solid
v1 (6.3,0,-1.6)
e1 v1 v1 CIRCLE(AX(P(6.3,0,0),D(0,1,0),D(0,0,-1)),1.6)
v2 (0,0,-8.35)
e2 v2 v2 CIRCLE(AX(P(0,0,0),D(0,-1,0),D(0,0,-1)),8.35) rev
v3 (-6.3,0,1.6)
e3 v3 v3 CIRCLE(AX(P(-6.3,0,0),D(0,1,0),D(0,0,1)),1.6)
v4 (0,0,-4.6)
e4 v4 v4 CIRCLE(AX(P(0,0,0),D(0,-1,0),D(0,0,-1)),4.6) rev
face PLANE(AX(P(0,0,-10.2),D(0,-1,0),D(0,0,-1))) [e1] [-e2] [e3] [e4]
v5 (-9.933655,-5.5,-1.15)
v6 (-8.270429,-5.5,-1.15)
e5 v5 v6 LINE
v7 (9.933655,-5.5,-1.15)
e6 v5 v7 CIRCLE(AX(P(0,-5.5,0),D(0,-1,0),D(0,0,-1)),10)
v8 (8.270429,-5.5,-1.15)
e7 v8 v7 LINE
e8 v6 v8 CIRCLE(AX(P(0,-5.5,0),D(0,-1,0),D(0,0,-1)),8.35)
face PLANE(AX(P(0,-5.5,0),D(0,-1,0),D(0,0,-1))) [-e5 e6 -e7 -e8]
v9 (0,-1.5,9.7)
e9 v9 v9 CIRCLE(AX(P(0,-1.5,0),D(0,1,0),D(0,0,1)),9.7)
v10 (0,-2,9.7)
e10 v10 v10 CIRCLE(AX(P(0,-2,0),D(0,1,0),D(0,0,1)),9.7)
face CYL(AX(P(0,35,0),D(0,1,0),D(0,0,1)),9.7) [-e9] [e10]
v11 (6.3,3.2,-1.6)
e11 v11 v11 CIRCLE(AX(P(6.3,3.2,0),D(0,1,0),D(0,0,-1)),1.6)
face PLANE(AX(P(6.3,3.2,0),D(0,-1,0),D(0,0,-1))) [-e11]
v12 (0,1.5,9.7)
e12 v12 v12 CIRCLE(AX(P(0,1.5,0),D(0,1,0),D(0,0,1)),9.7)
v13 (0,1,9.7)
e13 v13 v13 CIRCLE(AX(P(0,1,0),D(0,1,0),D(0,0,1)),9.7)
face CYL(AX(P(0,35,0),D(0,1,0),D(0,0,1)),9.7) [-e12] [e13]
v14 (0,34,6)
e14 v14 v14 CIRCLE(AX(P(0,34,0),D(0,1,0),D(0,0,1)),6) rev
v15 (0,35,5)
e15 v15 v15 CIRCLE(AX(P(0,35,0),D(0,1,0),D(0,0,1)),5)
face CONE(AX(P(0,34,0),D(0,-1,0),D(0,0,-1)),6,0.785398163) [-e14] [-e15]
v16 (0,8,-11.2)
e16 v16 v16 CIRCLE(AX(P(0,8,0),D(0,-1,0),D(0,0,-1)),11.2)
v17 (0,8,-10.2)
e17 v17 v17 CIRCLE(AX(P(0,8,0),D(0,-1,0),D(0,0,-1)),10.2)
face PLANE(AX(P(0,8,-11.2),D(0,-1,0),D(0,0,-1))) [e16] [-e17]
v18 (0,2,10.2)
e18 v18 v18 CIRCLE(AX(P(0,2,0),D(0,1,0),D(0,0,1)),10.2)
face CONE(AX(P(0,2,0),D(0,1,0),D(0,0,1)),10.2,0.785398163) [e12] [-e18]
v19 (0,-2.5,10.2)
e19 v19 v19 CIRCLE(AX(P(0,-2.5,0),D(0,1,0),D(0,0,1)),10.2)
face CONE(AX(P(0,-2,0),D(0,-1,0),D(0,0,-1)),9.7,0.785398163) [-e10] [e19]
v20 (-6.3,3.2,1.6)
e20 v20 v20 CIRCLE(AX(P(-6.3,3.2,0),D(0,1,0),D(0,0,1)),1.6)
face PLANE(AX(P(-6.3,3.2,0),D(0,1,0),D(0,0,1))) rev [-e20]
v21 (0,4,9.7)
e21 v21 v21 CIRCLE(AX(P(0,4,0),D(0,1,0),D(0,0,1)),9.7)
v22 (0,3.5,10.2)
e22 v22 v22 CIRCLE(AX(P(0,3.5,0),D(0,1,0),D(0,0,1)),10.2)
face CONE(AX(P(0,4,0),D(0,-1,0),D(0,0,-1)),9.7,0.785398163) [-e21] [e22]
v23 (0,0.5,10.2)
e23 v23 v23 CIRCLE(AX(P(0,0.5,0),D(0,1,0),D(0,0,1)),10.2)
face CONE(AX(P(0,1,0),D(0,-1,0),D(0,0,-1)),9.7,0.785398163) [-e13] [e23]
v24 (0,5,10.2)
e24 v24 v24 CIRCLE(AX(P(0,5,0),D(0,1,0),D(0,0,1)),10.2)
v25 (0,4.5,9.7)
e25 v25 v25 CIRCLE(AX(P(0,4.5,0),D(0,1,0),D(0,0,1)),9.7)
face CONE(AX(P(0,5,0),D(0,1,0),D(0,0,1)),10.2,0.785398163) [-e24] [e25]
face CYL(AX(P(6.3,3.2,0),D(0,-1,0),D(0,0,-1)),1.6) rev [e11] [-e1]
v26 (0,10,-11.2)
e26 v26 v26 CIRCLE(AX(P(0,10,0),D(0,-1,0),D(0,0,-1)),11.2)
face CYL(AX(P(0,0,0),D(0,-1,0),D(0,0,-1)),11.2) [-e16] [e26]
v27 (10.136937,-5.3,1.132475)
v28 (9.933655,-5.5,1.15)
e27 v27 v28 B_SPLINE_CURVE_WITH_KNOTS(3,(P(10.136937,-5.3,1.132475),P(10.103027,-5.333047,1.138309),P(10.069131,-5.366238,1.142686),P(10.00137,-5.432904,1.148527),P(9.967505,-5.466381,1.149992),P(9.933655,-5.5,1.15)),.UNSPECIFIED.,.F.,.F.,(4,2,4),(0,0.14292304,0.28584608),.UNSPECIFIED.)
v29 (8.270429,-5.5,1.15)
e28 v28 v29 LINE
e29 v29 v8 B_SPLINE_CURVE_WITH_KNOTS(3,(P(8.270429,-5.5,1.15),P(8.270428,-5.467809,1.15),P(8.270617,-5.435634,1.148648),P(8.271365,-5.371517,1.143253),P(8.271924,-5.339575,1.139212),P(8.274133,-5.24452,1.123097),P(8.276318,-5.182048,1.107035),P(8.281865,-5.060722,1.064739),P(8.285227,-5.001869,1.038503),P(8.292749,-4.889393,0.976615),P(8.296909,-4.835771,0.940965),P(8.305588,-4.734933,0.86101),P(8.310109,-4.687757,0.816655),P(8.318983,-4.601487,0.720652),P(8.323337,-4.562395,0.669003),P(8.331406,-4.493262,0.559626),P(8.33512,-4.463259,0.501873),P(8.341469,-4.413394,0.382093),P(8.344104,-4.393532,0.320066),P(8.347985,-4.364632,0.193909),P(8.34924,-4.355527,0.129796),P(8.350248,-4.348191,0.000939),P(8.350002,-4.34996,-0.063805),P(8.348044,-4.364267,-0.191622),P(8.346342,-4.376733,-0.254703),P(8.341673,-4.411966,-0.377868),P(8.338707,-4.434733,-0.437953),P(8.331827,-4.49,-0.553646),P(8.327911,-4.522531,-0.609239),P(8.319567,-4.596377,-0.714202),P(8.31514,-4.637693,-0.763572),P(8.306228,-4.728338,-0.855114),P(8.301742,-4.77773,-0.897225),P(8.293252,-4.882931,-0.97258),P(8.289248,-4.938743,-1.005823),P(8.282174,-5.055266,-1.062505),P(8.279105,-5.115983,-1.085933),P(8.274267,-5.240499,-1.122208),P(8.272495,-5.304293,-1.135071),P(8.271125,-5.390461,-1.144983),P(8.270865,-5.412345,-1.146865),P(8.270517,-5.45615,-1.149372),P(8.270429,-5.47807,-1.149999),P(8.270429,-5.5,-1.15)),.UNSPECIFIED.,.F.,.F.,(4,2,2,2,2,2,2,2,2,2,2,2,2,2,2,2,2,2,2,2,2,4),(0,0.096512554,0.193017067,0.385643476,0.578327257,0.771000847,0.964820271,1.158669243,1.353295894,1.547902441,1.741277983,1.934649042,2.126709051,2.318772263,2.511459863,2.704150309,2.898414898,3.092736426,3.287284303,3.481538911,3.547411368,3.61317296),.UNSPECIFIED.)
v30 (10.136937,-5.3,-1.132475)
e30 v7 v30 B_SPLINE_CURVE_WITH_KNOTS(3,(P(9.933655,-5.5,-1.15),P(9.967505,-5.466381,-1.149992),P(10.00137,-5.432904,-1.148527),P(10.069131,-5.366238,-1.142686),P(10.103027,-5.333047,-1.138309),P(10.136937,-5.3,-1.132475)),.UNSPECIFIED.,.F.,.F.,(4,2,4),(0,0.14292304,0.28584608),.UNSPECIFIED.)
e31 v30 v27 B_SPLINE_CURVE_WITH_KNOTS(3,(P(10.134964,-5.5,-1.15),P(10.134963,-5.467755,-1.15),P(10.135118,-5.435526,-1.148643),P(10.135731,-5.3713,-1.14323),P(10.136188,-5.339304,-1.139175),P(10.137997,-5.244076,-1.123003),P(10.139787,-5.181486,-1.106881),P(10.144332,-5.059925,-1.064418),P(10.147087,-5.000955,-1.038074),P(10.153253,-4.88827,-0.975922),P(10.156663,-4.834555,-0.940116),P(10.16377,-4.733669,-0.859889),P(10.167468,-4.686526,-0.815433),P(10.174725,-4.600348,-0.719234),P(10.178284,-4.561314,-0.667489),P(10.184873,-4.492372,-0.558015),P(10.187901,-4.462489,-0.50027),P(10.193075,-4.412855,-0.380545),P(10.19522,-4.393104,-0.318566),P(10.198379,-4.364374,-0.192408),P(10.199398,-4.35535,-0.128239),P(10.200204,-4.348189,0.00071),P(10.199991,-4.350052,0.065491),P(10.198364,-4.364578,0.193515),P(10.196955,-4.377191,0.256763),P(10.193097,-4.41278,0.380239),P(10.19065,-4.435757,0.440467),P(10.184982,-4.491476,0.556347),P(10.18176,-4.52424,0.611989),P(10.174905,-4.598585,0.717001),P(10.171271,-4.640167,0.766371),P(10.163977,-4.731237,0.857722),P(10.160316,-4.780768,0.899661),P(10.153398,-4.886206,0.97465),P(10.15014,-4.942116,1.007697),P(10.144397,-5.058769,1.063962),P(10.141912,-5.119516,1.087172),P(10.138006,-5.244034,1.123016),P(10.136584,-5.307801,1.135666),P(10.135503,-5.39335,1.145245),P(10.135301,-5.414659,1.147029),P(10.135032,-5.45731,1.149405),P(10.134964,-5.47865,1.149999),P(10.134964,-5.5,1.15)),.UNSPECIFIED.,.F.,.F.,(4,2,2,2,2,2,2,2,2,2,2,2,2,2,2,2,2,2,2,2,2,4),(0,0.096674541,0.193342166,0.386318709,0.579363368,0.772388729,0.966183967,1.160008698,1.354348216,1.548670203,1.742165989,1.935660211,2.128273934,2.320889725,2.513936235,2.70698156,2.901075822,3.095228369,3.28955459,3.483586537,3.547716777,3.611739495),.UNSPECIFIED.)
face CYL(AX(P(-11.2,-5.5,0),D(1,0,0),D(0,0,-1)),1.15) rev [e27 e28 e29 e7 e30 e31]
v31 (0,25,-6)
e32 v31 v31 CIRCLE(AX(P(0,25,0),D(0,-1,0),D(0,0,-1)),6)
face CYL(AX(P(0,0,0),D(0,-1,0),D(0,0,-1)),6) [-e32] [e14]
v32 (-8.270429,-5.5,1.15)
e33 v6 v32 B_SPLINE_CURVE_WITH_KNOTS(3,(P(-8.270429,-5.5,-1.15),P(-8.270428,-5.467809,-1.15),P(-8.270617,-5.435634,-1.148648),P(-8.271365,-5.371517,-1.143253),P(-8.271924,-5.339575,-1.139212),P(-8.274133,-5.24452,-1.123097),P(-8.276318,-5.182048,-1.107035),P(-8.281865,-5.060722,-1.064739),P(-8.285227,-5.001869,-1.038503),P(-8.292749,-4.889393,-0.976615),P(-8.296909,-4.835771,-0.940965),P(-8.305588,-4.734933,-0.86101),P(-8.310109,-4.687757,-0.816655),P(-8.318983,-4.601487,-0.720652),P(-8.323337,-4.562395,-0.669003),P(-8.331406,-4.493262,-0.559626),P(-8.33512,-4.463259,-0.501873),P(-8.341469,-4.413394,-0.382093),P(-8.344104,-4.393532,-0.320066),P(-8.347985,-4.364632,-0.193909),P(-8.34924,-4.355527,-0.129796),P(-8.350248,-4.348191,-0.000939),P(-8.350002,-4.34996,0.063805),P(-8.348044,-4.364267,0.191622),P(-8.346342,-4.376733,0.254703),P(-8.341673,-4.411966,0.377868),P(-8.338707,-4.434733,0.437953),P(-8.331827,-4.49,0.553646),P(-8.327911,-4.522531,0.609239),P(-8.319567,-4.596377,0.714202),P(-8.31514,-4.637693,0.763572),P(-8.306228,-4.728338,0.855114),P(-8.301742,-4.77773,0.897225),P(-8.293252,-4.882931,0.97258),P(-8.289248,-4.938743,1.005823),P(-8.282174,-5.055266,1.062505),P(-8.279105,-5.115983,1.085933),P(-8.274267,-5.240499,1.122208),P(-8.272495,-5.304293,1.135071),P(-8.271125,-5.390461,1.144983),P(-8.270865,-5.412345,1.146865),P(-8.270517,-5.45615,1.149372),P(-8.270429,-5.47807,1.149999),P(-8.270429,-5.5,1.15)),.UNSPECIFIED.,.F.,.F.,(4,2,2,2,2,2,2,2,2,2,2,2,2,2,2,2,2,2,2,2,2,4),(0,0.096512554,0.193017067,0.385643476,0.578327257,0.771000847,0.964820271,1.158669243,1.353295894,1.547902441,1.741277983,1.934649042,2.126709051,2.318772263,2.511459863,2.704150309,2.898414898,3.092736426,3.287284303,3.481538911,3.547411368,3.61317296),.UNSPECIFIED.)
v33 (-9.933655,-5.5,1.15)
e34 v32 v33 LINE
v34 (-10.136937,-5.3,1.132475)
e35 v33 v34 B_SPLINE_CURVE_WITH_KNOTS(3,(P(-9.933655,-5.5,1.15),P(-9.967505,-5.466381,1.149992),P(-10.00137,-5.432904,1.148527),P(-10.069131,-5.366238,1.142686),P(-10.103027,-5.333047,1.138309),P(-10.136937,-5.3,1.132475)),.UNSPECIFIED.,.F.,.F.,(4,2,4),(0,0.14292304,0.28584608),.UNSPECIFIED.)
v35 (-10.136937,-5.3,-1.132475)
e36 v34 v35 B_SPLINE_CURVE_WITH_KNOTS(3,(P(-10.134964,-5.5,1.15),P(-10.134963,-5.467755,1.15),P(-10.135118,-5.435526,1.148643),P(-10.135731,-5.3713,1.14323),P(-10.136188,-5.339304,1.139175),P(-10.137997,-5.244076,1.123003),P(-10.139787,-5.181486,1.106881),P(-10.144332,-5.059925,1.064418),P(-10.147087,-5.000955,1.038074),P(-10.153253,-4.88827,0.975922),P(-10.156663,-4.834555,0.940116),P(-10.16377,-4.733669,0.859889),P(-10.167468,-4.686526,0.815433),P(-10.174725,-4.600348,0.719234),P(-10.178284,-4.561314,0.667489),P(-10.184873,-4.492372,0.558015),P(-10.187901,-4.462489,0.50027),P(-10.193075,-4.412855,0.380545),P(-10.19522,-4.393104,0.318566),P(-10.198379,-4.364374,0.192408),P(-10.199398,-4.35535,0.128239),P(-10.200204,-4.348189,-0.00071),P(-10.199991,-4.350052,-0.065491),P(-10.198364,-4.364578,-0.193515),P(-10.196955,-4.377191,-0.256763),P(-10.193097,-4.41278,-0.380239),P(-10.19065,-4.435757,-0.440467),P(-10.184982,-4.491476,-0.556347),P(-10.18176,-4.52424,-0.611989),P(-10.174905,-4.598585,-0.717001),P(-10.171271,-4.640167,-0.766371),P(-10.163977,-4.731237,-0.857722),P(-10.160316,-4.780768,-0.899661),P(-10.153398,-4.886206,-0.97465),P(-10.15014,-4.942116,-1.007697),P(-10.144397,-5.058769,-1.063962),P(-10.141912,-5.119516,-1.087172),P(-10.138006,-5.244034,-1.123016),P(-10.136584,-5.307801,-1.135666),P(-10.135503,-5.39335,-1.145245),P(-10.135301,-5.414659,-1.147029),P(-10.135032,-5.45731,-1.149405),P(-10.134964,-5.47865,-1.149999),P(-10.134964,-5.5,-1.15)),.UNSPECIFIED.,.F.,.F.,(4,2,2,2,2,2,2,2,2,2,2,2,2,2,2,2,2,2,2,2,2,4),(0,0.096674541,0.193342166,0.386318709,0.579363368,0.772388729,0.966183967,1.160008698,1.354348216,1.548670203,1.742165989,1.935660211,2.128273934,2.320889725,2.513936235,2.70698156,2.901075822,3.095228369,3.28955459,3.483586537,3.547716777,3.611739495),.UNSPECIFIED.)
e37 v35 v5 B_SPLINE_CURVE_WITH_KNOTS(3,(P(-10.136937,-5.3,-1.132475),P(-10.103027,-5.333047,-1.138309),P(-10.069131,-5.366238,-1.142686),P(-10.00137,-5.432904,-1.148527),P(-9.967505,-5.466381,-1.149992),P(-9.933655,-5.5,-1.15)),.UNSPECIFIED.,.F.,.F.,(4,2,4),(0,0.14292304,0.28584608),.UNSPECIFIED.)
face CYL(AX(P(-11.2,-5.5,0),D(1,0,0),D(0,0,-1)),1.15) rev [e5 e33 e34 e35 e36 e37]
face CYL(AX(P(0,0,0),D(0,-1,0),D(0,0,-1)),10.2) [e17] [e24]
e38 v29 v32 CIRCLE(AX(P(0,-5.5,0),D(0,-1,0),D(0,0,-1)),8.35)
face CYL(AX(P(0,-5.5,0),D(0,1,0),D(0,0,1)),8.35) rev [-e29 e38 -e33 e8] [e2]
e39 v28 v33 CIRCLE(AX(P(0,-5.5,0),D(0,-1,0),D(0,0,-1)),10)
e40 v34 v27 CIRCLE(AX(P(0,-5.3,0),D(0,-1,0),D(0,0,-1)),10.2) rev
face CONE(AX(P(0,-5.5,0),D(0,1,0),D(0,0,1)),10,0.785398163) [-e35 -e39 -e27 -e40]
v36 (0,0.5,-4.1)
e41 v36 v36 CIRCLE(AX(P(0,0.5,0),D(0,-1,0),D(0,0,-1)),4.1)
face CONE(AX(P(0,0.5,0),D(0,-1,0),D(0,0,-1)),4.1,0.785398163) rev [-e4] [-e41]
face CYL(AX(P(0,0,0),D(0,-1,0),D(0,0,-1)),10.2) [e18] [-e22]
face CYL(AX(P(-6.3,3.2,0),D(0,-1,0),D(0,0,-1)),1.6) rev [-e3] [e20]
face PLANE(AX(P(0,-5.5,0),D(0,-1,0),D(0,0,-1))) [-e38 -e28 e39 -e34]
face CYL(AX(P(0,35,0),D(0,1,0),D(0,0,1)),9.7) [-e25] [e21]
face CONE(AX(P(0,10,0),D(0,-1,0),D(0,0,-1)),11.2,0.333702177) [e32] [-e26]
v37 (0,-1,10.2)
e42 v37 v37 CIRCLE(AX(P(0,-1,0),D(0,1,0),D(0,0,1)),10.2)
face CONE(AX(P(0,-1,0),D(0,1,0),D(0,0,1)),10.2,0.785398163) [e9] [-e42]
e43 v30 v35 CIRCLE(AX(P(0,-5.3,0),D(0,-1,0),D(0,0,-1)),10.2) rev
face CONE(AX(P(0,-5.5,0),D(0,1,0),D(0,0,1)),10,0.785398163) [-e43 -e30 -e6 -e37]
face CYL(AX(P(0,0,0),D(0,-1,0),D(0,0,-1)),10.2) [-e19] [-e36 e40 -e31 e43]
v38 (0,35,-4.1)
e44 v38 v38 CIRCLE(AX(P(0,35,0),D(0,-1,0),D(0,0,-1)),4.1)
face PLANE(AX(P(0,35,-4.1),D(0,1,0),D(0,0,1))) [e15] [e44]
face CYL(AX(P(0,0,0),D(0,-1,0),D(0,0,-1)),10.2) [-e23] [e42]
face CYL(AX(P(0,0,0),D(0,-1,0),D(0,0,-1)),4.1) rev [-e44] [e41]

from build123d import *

# Parameters (mm, degrees)
CHAMFER_1_SIZE           = 1
SKETCH_2_R               = 1.6
CUT_EXTRUDE_1_DEPTH      = 3.2
EXTRUDE_START            = 5.5
SKETCH_3_R               = 10.2
SKETCH_3_R_2             = 8.35
EXTRUDE_1_DEPTH          = 5.5
CHAMFER_2_SIZE           = 0.5
CUT_EXTRUDE_2_DEPTH      = 39.417183655
CUT_EXTRUDE_2_DEPTH_BACK = 39.417183655
SKETCH_4_R               = 1.15


with BuildPart() as part:
    # 스케치1 → 회전1 (revolve)
    with BuildSketch(Plane(origin=(0, 0, 0), x_dir=(0, 0, -1), z_dir=(1, 0, 0))):
        Polygon((4.1, 0), (4.1, 35), (6, 35), (6, 25), (11.2, 10), (11.2, 8), (10.2, 8), (10.2, 5.7), (10.2, 4), (10.2, 0), align=None)
    revolve(axis=Axis((0, 0, 0), (0, 1, 0)))

    # 모따기1
    chamfer_1_edges = [part.edges().sort_by_distance(p)[0] for p in [
        (0, 35, 6),
    ]]
    chamfer(chamfer_1_edges, length=CHAMFER_1_SIZE)

    # 스케치2 → 컷-돌출1 (cut)
    with BuildSketch(Plane(origin=(0, 0, 0), x_dir=(1, 0, 0), z_dir=(0, 1, 0))):
        with Locations(Location((-6.3, 0, 0), (0, 0, 270))):
            Circle(SKETCH_2_R)
        with Locations(Location((6.3, 0, 0), (0, 0, 90))):
            Circle(SKETCH_2_R)
    extrude(amount=CUT_EXTRUDE_1_DEPTH, mode=Mode.SUBTRACT)

    # 스케치3 → 보스-돌출1 (add)
    with BuildSketch(Plane.XZ.offset(EXTRUDE_START)):
        with Locations(Location((0, 0, 0), (0, 0, 270))):
            Circle(SKETCH_3_R)
        with Locations(Location((0, 0, 0), (0, 0, 270))):
            Circle(SKETCH_3_R_2, mode=Mode.SUBTRACT)
    extrude(amount=-EXTRUDE_1_DEPTH)

    # 모따기2
    chamfer_2_edges = [part.edges().sort_by_distance(p)[0] for p in [
        (0, 0, 4.1),
    ]]
    chamfer(chamfer_2_edges, length=CHAMFER_2_SIZE)

    # 스케치4 → 컷-돌출2 (cut, two sides: drawn at the far end of the back side and taken through both)
    with BuildSketch(Plane(origin=(0, 0, 0), x_dir=(0, 0, -1), z_dir=(1, 0, 0)).offset(-CUT_EXTRUDE_2_DEPTH_BACK)):
        with Locations((0, -5.5)):
            Circle(SKETCH_4_R)
    extrude(amount=CUT_EXTRUDE_2_DEPTH + CUT_EXTRUDE_2_DEPTH_BACK, mode=Mode.SUBTRACT)

    # 스케치6 → 컷-회전1 (revolve, cut)
    with BuildSketch(Plane(origin=(0, 0, 0), x_dir=(0, 0, -1), z_dir=(1, 0, 0)), mode=Mode.PRIVATE) as cut_revolve_1_sk:
        Polygon((10.2, 5), (9.7, 4.5), (9.7, 4), (10.2, 3.5), (11.2, 3.5), (11.2, 5), align=None)
        Polygon((9.7, 1.5), (9.7, 1), (10.2, 0.5), (11.2, 0.5), (11.2, 2), (10.2, 2), align=None)
        Polygon((9.7, -1.5), (9.7, -2), (10.2, -2.5), (11.2, -2.5), (11.2, -1), (10.2, -1), align=None)
    revolve(cut_revolve_1_sk.sketch.rotate(Axis((0, 0, 0), (0, -1, 0)), 180), axis=Axis((0, 0, 0), (0, -1, 0)), mode=Mode.SUBTRACT)

    # 모따기3: read off the stored shape, not the designer's step
    # 모따기3 outline → 모따기3 (revolve, cut)
    with BuildSketch(Plane.XY):
        Polygon((10.2, -5.3), (10, -5.5), (10.2, -5.5), align=None)
    revolve(axis=Axis((0, 0, 0), (0, 1, 0)), mode=Mode.SUBTRACT)


solid = part.part
